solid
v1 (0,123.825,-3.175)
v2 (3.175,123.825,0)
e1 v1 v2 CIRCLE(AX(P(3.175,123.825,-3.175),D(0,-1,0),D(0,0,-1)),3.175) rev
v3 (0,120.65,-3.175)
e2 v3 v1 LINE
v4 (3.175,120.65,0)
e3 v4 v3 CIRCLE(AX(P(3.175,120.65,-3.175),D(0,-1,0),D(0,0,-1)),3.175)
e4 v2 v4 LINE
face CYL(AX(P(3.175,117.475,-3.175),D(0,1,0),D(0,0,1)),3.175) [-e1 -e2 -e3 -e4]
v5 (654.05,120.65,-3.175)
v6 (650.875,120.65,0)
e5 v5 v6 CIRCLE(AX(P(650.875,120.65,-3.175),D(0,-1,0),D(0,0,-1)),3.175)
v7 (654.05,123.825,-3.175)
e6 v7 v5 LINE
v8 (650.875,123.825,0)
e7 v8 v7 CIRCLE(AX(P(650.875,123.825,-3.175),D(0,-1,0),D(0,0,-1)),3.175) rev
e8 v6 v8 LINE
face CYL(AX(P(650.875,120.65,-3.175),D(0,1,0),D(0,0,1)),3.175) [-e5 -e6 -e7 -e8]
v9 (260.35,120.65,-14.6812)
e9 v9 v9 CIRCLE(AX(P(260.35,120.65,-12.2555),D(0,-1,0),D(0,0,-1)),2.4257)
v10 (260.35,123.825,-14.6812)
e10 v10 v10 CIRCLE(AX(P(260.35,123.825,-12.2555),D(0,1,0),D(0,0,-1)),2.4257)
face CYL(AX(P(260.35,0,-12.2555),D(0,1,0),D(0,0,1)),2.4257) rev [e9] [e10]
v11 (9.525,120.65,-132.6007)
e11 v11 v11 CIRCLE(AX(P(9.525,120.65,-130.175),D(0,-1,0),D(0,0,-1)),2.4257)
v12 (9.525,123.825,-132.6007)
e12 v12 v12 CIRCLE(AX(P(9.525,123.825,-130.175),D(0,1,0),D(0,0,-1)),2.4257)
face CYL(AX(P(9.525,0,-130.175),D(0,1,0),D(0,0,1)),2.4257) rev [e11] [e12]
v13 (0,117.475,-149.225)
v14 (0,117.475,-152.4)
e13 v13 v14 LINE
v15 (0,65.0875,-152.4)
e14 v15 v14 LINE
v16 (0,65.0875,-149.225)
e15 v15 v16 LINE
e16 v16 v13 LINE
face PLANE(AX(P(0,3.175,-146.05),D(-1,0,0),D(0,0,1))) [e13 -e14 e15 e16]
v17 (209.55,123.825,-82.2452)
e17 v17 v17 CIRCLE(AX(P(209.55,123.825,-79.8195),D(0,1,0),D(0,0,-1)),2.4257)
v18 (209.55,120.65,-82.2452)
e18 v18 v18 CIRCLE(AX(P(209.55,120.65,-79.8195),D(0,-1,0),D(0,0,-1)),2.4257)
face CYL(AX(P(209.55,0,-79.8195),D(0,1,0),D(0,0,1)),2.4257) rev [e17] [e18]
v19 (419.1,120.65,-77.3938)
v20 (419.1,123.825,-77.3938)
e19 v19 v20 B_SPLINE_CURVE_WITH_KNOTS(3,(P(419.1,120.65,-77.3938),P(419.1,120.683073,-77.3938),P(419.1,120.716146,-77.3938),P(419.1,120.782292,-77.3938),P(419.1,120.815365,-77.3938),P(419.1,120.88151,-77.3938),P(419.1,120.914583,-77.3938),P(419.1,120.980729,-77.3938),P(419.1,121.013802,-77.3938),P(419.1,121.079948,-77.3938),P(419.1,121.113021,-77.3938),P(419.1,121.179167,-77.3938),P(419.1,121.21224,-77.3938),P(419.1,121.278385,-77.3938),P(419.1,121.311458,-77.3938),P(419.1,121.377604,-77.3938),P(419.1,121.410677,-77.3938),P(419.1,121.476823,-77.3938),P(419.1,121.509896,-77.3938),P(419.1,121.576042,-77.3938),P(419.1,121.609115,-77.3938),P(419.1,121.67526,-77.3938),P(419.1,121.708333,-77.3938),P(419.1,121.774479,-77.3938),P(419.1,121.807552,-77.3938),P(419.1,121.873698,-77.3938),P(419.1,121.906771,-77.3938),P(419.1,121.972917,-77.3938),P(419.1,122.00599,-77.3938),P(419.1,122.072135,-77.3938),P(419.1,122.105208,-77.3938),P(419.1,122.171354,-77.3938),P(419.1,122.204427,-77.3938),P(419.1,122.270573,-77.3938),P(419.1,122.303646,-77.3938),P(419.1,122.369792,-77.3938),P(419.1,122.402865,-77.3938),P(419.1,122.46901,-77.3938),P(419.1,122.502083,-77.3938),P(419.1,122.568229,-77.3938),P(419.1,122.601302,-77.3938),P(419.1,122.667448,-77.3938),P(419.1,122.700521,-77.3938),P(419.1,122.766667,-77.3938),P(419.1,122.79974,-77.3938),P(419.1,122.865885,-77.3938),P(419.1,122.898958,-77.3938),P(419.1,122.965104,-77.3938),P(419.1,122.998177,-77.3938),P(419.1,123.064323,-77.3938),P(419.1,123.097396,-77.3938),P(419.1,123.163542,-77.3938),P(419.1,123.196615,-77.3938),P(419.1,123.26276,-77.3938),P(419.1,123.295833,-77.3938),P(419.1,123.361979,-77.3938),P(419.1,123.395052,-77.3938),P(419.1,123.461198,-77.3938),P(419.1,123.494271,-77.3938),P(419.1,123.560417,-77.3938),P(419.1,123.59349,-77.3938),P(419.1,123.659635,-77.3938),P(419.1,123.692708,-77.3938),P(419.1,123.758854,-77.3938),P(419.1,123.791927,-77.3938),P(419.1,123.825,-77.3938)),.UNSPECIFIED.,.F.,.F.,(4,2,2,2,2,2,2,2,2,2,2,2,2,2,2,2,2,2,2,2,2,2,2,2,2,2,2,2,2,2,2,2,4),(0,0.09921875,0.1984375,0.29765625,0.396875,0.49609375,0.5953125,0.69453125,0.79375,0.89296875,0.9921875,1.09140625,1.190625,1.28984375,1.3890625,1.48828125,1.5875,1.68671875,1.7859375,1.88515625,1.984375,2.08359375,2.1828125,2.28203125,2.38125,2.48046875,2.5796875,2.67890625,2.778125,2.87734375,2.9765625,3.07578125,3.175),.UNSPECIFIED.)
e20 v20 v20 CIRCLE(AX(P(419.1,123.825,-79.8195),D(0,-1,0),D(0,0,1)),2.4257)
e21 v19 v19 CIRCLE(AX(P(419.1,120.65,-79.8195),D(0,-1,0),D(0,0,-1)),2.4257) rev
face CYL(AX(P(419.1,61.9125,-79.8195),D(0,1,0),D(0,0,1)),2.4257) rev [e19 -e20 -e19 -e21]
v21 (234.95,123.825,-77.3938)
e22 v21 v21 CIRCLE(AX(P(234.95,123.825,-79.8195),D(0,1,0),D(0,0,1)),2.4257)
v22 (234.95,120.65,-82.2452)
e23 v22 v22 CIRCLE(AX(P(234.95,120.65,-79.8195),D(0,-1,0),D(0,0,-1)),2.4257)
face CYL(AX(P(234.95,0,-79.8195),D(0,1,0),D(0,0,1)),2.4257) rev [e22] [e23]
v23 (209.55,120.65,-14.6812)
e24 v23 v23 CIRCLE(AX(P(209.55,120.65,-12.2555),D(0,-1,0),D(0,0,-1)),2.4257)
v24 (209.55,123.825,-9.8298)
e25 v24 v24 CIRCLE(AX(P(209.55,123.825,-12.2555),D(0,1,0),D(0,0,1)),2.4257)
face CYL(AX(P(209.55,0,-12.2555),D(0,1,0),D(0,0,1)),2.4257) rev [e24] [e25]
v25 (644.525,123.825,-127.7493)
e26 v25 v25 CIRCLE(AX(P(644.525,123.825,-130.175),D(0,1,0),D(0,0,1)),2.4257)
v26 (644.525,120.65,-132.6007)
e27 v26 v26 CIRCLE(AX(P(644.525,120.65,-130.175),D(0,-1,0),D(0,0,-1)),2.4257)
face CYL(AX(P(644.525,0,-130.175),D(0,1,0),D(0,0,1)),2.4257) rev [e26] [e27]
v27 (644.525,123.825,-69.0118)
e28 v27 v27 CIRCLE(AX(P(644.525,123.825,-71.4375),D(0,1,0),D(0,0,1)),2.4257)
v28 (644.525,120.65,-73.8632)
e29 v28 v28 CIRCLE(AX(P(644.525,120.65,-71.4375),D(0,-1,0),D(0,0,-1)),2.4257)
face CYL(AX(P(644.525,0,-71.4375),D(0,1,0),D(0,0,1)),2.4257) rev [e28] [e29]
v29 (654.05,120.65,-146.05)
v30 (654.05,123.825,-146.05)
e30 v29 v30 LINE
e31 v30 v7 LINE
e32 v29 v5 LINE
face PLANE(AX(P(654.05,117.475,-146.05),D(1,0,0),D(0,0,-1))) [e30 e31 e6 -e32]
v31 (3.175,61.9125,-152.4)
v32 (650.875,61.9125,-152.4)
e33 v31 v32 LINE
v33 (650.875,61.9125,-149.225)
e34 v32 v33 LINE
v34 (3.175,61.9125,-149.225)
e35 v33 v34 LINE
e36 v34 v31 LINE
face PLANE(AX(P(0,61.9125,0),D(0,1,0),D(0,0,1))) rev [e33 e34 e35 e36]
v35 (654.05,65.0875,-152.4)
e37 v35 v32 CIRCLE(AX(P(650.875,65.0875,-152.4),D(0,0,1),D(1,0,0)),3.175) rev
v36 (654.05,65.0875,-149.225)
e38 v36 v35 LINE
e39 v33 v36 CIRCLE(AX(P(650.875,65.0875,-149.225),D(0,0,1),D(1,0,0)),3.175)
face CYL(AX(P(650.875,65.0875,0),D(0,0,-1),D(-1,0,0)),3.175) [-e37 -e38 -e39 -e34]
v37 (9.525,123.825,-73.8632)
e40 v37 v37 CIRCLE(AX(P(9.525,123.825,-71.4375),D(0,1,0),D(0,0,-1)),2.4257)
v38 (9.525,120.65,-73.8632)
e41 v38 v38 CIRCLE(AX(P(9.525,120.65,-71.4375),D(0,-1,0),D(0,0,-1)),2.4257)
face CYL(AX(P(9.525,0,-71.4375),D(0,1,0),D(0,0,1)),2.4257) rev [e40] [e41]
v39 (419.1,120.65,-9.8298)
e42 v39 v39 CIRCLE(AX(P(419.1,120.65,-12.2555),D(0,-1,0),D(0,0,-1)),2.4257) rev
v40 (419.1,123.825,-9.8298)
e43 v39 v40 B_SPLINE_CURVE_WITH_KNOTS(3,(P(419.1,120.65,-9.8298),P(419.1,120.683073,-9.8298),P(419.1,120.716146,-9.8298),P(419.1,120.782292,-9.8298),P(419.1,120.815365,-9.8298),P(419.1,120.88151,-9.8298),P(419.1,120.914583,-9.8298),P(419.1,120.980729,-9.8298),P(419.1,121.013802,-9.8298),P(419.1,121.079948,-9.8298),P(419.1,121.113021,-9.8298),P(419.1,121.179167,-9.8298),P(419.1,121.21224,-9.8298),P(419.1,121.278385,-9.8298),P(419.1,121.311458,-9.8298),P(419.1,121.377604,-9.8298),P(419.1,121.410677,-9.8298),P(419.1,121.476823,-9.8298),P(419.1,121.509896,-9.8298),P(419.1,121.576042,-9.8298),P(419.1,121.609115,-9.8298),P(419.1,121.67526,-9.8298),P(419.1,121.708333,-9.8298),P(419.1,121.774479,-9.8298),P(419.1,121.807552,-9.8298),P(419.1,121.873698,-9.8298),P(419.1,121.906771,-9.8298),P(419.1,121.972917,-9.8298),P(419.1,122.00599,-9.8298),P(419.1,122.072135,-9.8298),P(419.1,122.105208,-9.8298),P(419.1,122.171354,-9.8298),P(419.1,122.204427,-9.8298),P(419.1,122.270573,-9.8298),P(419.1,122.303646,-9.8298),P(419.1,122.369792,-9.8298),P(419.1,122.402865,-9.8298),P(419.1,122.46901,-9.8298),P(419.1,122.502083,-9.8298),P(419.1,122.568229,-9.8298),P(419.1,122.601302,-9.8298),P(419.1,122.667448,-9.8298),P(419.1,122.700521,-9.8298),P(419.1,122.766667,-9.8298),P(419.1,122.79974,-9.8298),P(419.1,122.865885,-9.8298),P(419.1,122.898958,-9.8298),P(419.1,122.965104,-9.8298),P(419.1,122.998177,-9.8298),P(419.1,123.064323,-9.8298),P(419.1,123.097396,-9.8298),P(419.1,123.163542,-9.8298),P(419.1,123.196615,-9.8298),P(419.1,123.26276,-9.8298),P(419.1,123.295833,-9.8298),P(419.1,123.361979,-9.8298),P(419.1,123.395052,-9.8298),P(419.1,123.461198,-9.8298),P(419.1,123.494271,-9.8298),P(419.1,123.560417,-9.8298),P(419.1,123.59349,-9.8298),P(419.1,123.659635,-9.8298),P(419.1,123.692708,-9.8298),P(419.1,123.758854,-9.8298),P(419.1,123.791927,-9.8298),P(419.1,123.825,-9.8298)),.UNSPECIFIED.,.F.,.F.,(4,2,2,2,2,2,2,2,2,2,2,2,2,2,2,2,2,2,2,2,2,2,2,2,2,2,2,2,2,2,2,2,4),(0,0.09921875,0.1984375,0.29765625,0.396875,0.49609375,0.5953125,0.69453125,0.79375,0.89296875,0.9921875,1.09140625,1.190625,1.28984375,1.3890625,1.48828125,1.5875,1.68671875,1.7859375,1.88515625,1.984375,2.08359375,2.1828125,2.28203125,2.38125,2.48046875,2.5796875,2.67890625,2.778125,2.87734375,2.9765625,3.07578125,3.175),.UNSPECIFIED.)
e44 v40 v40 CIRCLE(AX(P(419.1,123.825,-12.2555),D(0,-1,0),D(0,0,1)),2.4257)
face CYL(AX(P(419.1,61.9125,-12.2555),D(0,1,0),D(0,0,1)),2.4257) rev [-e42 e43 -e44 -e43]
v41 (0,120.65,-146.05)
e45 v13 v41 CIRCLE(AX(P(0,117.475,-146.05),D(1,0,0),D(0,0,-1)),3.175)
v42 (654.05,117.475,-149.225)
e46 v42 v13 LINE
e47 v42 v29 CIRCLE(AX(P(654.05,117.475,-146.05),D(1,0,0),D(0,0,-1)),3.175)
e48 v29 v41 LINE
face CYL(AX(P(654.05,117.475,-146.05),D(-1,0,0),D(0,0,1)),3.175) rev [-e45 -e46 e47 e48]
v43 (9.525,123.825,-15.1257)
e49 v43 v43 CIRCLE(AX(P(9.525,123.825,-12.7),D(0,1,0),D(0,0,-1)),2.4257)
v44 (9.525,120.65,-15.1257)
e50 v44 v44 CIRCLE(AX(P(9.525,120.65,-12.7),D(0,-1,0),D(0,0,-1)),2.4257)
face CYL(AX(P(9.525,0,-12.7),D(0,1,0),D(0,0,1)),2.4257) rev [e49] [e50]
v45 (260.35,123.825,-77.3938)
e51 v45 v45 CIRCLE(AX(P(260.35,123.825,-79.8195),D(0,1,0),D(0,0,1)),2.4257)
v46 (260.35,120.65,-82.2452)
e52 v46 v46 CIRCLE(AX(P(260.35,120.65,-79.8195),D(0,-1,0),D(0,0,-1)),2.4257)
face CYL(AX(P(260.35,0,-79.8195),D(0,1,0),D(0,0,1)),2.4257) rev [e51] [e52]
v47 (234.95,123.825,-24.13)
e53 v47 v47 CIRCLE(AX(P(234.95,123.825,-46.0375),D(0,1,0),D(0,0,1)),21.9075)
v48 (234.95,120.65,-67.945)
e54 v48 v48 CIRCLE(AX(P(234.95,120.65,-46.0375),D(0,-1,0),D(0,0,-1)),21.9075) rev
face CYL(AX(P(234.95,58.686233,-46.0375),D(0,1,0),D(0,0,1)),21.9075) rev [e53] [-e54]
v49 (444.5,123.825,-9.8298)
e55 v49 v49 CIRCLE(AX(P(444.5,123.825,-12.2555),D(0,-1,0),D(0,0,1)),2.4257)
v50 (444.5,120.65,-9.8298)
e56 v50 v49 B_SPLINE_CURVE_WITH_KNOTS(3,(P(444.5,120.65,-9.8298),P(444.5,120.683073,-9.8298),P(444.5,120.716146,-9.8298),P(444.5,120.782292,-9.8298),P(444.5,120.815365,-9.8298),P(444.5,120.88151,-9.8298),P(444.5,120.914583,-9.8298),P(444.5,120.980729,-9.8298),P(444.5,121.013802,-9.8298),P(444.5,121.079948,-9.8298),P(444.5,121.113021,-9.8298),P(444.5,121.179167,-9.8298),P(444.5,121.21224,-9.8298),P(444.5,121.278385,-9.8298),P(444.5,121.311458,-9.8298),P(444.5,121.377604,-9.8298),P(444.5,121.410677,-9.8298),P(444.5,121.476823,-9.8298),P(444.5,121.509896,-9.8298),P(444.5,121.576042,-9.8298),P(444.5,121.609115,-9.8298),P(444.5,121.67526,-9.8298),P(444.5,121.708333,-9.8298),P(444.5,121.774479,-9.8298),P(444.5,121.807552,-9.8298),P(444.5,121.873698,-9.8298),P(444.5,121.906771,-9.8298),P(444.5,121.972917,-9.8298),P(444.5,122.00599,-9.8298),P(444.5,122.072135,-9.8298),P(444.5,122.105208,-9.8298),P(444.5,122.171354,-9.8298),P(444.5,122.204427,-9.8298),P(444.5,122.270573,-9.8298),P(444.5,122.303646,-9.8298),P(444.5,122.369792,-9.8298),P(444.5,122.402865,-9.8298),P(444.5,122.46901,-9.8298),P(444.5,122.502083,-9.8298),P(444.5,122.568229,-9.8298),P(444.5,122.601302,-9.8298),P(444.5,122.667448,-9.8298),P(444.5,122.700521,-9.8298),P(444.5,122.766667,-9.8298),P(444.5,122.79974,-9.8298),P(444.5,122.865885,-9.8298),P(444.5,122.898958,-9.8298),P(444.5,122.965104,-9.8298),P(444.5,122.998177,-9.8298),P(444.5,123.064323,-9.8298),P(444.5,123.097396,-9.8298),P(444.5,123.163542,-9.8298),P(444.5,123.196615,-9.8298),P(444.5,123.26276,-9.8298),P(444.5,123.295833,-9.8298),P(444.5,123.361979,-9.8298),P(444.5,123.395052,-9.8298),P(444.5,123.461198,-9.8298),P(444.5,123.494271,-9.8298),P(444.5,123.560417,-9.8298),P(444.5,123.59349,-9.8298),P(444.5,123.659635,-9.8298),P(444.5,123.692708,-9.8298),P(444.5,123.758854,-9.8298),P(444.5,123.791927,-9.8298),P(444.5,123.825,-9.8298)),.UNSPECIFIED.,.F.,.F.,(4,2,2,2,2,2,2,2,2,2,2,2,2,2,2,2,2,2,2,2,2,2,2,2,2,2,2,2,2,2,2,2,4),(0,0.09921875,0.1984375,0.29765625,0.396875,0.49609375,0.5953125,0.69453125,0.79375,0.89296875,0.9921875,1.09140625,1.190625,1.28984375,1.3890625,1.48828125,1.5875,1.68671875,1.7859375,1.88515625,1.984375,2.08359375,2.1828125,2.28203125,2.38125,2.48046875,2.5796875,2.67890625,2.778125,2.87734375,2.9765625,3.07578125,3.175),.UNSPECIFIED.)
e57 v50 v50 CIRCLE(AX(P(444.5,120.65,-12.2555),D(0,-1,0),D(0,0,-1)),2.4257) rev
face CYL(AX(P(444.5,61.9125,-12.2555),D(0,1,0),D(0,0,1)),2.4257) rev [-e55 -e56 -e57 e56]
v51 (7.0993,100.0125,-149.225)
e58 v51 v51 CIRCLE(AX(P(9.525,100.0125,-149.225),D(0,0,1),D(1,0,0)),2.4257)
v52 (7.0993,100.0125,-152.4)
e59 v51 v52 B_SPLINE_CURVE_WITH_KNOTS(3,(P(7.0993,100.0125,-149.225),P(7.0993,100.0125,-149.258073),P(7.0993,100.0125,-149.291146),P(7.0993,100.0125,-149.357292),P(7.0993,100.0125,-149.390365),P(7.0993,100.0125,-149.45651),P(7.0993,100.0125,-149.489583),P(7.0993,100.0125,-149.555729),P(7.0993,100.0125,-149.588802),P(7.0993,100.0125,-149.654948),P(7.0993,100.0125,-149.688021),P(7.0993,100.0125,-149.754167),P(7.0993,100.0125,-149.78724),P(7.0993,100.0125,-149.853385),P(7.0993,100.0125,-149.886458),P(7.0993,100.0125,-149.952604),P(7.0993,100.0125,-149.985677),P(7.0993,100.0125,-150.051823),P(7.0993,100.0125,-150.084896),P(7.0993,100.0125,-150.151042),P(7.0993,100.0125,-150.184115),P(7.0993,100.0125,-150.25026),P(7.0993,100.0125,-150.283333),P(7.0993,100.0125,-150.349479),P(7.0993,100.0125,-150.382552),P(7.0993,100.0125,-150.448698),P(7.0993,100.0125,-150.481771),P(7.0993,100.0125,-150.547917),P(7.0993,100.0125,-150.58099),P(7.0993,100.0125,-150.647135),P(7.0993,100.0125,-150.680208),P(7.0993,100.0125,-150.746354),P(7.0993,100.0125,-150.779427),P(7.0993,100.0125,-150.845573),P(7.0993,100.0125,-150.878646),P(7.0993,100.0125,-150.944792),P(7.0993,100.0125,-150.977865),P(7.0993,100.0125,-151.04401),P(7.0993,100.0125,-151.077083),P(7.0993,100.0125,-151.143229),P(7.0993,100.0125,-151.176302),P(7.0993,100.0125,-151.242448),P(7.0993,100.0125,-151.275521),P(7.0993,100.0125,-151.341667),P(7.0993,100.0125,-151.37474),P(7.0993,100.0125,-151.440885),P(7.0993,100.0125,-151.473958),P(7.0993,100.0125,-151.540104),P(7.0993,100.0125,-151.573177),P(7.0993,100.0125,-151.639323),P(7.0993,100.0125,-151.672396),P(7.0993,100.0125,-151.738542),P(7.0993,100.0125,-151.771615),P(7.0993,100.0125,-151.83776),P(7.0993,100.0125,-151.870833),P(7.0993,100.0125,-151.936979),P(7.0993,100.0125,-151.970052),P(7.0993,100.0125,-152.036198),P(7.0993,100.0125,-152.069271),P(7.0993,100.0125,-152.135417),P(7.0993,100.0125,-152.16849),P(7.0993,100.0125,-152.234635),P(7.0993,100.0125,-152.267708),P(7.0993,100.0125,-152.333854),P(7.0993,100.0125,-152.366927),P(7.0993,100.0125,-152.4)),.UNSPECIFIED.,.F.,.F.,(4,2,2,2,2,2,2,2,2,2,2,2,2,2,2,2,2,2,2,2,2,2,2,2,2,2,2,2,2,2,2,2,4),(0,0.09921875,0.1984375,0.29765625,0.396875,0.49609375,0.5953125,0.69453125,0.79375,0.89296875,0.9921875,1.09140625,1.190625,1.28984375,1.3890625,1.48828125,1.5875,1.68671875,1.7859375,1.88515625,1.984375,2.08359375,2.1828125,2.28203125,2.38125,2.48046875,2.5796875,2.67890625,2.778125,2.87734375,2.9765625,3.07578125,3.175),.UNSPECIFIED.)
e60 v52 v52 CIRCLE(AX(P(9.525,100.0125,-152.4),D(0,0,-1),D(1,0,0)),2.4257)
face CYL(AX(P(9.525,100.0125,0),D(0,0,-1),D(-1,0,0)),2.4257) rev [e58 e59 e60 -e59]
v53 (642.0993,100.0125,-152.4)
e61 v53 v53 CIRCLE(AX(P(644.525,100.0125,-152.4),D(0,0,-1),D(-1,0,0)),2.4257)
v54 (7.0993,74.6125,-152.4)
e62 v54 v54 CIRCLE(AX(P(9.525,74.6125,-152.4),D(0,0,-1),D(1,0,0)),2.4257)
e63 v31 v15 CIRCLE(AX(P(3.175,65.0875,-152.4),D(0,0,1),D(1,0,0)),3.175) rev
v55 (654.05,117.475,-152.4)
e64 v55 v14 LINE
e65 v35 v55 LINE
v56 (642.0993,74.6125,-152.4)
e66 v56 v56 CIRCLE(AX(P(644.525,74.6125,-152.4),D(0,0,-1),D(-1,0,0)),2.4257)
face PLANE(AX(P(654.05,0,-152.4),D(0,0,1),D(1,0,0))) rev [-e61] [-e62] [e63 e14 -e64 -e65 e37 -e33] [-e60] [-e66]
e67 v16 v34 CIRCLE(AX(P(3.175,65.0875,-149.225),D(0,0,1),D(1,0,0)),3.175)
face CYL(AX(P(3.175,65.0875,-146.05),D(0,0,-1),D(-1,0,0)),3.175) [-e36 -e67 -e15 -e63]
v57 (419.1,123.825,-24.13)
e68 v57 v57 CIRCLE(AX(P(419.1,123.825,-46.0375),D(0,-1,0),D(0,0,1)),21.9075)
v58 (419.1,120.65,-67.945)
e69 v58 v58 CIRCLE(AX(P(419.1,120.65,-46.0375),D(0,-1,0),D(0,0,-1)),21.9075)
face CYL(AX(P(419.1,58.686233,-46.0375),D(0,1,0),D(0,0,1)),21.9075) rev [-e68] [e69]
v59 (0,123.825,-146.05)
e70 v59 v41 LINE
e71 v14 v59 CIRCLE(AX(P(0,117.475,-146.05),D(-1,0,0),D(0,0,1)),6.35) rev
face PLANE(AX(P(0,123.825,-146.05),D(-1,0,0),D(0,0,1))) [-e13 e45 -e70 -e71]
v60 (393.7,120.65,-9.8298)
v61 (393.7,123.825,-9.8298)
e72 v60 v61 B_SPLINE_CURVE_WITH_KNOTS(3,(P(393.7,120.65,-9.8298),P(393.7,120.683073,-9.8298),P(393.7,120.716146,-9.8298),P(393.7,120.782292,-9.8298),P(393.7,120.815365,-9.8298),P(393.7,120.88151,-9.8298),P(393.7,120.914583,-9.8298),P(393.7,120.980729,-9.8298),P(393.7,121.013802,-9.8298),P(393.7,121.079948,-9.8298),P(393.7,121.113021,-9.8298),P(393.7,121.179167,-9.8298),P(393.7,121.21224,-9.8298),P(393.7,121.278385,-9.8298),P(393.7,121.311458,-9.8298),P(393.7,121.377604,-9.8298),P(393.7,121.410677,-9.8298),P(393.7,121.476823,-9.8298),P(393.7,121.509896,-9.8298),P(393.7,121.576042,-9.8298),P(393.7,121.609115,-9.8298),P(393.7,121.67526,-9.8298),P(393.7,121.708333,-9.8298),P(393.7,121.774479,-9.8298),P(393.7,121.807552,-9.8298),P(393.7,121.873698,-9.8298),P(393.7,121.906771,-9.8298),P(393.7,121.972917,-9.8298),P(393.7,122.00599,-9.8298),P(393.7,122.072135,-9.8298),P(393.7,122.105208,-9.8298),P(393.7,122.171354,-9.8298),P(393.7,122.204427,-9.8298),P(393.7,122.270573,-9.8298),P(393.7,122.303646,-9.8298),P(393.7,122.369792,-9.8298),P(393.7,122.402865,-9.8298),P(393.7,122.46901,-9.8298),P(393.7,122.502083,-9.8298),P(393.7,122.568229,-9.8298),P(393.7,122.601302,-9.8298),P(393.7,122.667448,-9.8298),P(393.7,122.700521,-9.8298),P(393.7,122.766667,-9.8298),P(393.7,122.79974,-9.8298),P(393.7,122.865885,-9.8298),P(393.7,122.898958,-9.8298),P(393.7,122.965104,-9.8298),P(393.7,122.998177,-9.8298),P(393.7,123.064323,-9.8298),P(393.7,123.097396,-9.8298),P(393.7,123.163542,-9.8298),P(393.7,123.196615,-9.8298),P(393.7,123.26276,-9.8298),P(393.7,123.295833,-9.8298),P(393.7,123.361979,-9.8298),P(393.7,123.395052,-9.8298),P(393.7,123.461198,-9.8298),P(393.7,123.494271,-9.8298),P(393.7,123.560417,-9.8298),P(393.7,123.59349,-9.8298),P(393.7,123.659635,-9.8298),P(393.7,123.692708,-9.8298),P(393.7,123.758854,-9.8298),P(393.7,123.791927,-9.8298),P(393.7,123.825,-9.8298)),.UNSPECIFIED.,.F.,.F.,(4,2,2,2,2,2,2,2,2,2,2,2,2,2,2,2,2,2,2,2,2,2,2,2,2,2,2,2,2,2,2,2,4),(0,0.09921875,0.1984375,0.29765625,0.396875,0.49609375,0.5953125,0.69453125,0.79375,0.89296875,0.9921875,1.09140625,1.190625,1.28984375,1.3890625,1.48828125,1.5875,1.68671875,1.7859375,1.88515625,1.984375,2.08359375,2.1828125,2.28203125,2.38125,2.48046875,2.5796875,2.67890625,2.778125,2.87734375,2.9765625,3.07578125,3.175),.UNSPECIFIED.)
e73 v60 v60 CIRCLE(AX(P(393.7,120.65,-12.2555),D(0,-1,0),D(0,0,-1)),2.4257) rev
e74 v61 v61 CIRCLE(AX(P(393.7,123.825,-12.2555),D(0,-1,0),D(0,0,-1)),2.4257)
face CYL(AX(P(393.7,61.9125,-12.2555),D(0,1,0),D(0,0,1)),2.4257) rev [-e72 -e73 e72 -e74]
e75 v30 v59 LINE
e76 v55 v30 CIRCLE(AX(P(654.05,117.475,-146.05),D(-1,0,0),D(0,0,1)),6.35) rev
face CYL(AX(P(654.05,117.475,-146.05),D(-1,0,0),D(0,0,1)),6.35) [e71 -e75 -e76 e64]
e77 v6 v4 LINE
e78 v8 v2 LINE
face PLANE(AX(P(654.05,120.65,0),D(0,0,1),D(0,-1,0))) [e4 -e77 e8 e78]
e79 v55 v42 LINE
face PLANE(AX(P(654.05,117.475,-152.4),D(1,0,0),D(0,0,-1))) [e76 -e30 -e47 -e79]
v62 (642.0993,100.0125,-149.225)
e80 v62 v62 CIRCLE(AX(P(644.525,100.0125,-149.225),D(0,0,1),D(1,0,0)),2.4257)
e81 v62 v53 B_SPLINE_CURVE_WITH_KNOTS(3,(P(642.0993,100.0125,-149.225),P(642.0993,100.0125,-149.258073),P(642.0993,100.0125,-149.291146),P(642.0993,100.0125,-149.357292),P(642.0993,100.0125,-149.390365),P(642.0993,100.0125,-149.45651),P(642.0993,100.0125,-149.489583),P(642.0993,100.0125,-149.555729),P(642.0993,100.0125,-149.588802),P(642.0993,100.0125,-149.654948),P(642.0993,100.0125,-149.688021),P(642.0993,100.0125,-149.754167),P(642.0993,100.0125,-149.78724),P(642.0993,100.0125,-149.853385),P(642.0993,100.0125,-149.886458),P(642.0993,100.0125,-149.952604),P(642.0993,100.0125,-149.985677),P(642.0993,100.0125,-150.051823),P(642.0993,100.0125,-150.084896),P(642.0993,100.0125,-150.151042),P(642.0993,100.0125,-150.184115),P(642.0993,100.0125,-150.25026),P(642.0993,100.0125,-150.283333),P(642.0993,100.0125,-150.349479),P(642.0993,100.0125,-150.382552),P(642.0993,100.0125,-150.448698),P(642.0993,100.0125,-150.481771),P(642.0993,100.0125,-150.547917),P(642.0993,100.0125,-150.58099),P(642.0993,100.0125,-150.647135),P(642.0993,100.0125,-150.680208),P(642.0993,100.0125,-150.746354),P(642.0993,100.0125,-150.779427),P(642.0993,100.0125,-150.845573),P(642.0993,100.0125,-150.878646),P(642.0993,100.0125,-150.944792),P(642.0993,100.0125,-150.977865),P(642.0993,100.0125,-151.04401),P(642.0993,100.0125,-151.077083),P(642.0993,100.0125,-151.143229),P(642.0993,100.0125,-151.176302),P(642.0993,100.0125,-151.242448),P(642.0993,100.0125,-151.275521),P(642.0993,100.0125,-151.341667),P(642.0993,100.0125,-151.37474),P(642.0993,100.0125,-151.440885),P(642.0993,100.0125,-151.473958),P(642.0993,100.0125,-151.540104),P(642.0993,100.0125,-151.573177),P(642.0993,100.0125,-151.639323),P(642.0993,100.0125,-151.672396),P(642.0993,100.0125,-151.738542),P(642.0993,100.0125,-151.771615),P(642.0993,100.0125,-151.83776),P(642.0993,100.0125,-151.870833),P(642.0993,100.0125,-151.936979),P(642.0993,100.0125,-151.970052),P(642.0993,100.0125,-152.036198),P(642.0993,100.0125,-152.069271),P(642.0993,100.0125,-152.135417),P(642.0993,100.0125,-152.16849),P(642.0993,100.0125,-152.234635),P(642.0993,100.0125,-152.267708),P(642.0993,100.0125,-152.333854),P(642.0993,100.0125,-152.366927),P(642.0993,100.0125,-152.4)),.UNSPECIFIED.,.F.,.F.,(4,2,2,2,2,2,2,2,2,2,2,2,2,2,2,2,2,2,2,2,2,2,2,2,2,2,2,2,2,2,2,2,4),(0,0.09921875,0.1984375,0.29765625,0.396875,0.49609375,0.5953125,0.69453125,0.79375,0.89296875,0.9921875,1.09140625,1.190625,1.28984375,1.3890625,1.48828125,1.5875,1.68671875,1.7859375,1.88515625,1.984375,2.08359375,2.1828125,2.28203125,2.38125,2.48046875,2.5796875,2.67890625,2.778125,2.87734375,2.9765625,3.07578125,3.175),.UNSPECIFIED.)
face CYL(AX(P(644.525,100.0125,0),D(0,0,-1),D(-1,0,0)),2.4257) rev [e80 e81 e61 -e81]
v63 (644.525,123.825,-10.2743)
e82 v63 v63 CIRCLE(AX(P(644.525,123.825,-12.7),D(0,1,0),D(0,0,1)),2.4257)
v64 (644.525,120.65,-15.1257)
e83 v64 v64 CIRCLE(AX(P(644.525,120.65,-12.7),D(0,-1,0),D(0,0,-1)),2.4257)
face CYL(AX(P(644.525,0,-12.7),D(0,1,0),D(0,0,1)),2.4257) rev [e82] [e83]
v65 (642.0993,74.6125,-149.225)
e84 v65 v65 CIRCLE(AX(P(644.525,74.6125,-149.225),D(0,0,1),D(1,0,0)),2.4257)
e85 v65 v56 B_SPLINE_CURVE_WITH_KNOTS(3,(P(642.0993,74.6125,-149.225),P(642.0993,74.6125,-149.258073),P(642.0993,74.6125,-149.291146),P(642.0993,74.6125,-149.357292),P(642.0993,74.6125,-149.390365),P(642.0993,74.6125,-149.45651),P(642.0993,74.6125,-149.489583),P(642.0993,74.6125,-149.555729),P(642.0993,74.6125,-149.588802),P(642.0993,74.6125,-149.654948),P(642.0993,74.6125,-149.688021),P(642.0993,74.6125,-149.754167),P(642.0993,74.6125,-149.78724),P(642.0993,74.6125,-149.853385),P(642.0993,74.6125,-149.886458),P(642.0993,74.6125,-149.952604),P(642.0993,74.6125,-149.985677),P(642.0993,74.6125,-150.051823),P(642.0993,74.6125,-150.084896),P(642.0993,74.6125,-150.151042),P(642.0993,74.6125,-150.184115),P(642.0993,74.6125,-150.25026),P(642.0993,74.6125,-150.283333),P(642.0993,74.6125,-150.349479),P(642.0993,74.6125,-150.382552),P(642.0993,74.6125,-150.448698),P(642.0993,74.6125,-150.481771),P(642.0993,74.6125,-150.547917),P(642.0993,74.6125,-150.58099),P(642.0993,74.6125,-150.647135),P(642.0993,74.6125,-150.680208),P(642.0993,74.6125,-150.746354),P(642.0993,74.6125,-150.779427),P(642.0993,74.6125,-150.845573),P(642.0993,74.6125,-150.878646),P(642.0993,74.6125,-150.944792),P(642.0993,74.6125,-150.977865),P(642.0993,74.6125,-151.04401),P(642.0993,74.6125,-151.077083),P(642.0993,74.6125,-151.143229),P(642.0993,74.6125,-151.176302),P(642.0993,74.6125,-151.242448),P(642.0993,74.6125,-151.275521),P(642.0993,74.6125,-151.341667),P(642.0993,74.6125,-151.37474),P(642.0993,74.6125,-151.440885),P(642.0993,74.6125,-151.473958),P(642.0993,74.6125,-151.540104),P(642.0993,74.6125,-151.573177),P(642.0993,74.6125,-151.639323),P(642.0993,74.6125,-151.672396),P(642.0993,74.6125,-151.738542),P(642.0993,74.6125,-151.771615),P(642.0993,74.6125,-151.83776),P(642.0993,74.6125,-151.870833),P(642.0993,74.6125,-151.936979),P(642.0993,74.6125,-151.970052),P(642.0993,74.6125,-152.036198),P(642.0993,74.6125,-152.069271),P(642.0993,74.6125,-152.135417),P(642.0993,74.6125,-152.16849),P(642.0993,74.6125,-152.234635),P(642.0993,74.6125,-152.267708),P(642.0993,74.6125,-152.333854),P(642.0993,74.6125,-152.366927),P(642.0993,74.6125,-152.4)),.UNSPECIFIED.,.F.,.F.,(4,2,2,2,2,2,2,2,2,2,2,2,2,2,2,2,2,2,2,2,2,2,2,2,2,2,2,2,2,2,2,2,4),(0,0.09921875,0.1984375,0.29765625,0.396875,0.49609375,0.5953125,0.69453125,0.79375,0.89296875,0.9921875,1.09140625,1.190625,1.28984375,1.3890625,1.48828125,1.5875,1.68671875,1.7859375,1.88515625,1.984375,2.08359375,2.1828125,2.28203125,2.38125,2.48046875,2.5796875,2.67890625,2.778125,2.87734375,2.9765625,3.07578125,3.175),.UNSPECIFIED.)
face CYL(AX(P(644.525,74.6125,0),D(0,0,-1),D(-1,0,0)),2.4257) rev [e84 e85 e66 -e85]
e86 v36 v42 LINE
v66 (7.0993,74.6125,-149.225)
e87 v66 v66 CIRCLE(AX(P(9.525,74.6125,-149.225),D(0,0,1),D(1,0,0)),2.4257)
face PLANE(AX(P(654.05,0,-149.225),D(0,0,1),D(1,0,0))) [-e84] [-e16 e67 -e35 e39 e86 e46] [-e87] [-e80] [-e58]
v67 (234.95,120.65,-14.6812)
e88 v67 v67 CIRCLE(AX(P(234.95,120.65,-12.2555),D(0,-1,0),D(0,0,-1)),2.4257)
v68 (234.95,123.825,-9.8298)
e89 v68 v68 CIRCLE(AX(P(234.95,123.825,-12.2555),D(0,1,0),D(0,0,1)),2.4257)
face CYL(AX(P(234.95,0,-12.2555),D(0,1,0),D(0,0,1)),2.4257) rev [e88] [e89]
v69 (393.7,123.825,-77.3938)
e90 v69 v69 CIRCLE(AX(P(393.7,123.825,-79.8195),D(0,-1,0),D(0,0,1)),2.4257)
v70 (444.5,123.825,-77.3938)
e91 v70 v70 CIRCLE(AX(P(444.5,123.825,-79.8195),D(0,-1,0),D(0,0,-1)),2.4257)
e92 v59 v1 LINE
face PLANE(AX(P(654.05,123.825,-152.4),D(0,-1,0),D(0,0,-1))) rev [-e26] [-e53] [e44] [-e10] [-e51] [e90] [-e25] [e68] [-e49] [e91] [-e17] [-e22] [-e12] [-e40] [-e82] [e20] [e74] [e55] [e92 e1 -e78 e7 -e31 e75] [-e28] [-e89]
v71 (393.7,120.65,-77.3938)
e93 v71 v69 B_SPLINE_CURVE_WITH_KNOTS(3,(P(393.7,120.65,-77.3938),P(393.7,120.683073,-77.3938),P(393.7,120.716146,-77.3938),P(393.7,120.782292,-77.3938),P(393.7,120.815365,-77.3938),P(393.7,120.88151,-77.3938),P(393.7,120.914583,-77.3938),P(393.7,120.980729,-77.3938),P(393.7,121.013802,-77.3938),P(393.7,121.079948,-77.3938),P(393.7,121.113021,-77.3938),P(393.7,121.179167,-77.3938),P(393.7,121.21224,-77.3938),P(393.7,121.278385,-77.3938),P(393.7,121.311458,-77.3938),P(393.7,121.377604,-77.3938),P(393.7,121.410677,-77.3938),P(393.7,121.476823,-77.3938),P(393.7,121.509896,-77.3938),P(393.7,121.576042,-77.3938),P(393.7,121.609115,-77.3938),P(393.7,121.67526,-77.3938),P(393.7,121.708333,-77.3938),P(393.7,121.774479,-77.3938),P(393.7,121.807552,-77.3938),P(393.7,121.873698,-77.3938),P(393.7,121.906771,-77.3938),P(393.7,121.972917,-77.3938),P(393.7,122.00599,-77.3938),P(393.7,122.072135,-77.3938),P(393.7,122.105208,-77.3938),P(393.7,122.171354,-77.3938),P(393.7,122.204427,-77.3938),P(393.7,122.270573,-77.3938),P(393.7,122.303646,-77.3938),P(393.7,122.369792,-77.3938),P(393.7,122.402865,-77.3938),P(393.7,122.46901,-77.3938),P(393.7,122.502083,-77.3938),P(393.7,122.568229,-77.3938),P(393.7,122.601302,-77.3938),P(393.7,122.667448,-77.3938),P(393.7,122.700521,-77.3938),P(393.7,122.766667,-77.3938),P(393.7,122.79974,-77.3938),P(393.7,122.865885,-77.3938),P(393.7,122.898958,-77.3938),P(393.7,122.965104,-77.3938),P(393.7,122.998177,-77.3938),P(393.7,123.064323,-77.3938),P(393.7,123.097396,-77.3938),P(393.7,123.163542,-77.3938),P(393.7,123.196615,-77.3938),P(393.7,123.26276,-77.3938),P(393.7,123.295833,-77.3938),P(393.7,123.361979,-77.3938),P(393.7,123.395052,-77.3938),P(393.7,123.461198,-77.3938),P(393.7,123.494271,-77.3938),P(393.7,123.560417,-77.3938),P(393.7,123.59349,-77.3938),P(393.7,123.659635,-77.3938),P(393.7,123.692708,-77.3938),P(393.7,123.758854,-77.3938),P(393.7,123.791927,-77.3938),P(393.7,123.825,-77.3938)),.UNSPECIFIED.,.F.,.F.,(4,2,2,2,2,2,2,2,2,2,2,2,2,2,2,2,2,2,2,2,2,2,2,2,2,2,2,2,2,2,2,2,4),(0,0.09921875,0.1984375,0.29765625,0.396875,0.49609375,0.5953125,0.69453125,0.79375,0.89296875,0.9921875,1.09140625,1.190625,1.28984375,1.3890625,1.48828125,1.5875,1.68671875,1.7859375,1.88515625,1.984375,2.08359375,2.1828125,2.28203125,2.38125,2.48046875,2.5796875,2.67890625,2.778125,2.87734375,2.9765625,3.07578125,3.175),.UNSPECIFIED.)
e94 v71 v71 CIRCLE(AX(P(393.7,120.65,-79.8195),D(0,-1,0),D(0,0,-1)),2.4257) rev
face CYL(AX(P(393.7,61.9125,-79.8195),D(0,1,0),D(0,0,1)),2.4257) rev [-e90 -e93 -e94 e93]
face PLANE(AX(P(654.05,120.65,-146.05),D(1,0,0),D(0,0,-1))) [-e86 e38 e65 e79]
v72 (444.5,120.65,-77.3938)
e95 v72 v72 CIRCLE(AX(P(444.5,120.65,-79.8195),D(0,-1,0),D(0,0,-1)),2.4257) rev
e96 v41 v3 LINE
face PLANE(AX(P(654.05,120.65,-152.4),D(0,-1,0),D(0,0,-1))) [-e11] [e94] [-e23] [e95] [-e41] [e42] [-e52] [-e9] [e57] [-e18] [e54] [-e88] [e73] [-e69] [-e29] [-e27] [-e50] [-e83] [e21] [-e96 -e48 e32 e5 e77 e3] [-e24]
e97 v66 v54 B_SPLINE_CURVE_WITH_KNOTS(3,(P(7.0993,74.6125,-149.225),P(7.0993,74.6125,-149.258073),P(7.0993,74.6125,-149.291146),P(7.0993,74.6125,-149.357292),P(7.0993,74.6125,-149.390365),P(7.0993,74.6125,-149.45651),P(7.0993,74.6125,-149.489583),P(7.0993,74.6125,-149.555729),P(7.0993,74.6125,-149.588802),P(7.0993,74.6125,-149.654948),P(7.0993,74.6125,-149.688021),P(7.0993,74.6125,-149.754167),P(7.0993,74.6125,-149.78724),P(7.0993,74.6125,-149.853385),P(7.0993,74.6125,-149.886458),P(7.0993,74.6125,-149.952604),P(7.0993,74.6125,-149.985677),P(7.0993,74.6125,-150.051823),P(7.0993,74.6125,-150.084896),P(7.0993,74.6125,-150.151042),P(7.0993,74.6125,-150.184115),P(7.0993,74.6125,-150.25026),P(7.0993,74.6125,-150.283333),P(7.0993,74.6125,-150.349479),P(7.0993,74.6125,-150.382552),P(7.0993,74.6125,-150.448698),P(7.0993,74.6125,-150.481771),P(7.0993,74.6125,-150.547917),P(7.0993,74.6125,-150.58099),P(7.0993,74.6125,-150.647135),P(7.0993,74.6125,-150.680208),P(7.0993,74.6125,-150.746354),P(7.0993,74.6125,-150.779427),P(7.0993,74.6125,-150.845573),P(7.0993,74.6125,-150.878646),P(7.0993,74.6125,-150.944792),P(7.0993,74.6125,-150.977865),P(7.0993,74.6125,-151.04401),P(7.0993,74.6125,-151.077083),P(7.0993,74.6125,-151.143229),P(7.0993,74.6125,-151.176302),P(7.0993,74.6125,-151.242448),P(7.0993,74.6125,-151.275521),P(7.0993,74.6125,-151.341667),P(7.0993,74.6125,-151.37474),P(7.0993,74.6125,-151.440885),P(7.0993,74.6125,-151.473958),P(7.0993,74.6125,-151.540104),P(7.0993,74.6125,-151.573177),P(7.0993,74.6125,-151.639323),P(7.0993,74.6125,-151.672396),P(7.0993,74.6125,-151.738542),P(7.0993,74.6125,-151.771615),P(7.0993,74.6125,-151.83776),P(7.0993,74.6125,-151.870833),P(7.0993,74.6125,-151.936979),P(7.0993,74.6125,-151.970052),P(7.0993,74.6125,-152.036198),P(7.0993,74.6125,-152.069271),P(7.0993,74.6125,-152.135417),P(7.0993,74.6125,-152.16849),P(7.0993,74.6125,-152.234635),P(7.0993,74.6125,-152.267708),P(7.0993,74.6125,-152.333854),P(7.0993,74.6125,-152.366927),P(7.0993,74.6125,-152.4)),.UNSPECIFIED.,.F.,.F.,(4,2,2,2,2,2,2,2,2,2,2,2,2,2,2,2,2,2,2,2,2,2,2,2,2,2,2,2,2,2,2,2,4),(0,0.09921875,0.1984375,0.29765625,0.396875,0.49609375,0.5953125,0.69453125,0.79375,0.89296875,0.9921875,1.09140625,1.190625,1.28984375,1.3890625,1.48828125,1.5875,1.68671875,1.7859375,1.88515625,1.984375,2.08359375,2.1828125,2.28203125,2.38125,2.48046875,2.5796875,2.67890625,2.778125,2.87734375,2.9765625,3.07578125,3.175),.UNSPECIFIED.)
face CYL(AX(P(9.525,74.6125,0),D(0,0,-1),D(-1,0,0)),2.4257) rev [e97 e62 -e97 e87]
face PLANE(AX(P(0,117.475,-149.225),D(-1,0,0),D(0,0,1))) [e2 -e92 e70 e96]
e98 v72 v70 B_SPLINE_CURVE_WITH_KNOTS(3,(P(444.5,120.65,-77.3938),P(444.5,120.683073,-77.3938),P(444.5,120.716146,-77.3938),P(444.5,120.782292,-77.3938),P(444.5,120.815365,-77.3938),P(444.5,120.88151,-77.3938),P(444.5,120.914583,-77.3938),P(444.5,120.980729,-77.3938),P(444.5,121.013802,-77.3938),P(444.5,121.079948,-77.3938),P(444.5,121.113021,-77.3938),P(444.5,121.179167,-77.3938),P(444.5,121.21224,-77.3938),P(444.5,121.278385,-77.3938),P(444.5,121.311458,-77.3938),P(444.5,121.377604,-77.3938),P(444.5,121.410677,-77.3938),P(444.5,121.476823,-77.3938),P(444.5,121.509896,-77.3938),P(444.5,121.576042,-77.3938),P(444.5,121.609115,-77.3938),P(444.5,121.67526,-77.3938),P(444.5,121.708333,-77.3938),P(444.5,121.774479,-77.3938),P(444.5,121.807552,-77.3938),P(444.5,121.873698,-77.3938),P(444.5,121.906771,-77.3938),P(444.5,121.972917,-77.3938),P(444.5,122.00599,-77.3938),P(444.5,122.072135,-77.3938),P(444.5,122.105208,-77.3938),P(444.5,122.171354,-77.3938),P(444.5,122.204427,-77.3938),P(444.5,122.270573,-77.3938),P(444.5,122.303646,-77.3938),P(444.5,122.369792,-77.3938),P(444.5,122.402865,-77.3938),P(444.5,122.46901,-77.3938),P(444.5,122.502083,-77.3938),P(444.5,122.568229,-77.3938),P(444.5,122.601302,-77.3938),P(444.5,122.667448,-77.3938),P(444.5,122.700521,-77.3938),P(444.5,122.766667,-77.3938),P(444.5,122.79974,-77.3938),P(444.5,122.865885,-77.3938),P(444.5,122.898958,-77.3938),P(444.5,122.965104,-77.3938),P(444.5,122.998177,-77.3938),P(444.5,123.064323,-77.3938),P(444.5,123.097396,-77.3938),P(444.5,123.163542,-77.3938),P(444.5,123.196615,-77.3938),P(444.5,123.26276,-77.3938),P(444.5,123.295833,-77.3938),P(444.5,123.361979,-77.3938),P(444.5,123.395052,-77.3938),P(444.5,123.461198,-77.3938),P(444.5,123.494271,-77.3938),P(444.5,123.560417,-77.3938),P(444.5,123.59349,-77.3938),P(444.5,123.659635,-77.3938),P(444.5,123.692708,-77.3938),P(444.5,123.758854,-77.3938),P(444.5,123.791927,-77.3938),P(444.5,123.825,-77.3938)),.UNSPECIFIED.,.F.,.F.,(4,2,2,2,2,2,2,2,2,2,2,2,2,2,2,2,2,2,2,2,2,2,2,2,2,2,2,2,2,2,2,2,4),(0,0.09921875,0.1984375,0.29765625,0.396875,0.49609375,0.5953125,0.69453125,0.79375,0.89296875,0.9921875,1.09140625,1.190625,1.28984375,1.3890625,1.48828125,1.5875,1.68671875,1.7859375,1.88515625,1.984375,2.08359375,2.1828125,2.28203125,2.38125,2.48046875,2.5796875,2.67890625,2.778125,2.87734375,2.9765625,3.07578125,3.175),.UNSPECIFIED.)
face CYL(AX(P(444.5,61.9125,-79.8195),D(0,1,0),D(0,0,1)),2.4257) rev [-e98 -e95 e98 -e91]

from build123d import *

# Parameters (mm, degrees)
BASE_FLANGE1_DEPTH = 654.05
SKETCH6_R          = 21.9075
CUT_EXTRUDE1_DEPTH = 3.175
SKETCH7_R          = 2.4257
CUT_EXTRUDE2_DEPTH = 683.89076222
SKETCH8_R          = 2.4257
CUT_EXTRUDE3_DEPTH = 683.89076222
SKETCH9_R          = 2.4257
CUT_EXTRUDE4_DEPTH = 683.89076222
FILLET1_R          = 3.175
SKETCH10_W         = 152.4
SKETCH10_H         = 61.9125
CUT_EXTRUDE5_DEPTH = 683.89076222
FILLET2_R          = 3.175


# Sheet-metal steps are written as plain solids
with BuildPart() as part:
    # Sketch1 → Base-Flange1 (new body)
    with BuildSketch(Plane(origin=(0, 0, 0), x_dir=(0, 0, -1), z_dir=(1, 0, 0))):
        with BuildLine():
            Line((0, 0), (146.05, 0))
            ThreePointArc((146.05, 0), (150.540128061, 1.859871939), (152.4, 6.35))
            Line((152.4, 6.35), (152.4, 117.475))
            ThreePointArc((152.4, 117.475), (150.540128061, 121.965128061), (146.05, 123.825))
            Line((146.05, 123.825), (0, 123.825))
            Line((0, 123.825), (0, 120.65))
            Line((0, 120.65), (146.05, 120.65))
            ThreePointArc((146.05, 120.65), (148.29506403, 119.72006403), (149.225, 117.475))
            Line((149.225, 117.475), (149.225, 6.35))
            ThreePointArc((149.225, 6.35), (148.29506403, 4.10493597), (146.05, 3.175))
            Line((146.05, 3.175), (0, 3.175))
            Line((0, 3.175), (0, 0))
        make_face()
    extrude(amount=BASE_FLANGE1_DEPTH)

    # Sketch6 → Cut-Extrude1 (cut)
    with BuildSketch(Plane(origin=(0, 123.825, 0), x_dir=(1, 0, 0), z_dir=(0, 1, 0))):
        with Locations(Location((234.95, 46.0375, 0), (0, 0, 270))):
            Circle(SKETCH6_R)
    cut_extrude1 = extrude(amount=-CUT_EXTRUDE1_DEPTH, mode=Mode.SUBTRACT)

    # Sketch7 → Cut-Extrude2 (cut, through all)
    with BuildSketch(Plane(origin=(0, 123.825, 0), x_dir=(1, 0, 0), z_dir=(0, 1, 0))):
        with Locations(Location((234.95, 12.2555, 0), (0, 0, 270))):
            Circle(SKETCH7_R)
        with Locations(Location((234.95, 79.8195, 0), (0, 0, 270))):
            Circle(SKETCH7_R)
        with Locations(Location((209.55, 12.2555, 0), (0, 0, 270))):
            Circle(SKETCH7_R)
        with Locations(Location((260.35, 12.2555, 0), (0, 0, 270))):
            Circle(SKETCH7_R)
        with Locations(Location((260.35, 79.8195, 0), (0, 0, 270))):
            Circle(SKETCH7_R)
        with Locations(Location((209.55, 79.8195, 0), (0, 0, 270))):
            Circle(SKETCH7_R)
    cut_extrude2 = extrude(amount=-CUT_EXTRUDE2_DEPTH, mode=Mode.SUBTRACT)

    # Sketch8 → Cut-Extrude3 (cut, through all)
    with BuildSketch(Plane(origin=(0, 123.825, 0), x_dir=(1, 0, 0), z_dir=(0, 1, 0))):
        with Locations(Location((644.525, 12.7, 0), (0, 0, 270))):
            Circle(SKETCH8_R)
        with Locations(Location((644.525, 71.4375, 0), (0, 0, 270))):
            Circle(SKETCH8_R)
        with Locations(Location((644.525, 130.175, 0), (0, 0, 270))):
            Circle(SKETCH8_R)
        with Locations(Location((9.525, 130.175, 0), (0, 0, 270))):
            Circle(SKETCH8_R)
        with Locations(Location((9.525, 71.4375, 0), (0, 0, 270))):
            Circle(SKETCH8_R)
        with Locations(Location((9.525, 12.7, 0), (0, 0, 270))):
            Circle(SKETCH8_R)
    extrude(amount=-CUT_EXTRUDE3_DEPTH, mode=Mode.SUBTRACT)

    # Sketch9 → Cut-Extrude4 (cut, through all)
    with BuildSketch(Plane(origin=(0, 0, -152.4), x_dir=(-1, 0, 0), z_dir=(0, 0, -1))):
        with Locations((-644.525, 74.6125)):
            Circle(SKETCH9_R)
        with Locations((-644.525, 49.2125)):
            Circle(SKETCH9_R)
        with Locations((-9.525, 49.2125)):
            Circle(SKETCH9_R)
        with Locations((-9.525, 74.6125)):
            Circle(SKETCH9_R)
        with Locations((-644.525, 100.0125)):
            Circle(SKETCH9_R)
        with Locations((-644.525, 23.8125)):
            Circle(SKETCH9_R)
        with Locations((-9.525, 23.8125)):
            Circle(SKETCH9_R)
        with Locations((-9.525, 100.0125)):
            Circle(SKETCH9_R)
    extrude(amount=-CUT_EXTRUDE4_DEPTH, mode=Mode.SUBTRACT)

    # Fillet1
    fillet1_edges = [part.edges().sort_by_distance(p)[0] for p in [
        (0, 1.5875, 0),
        (0, 122.2375, 0),
        (654.05, 1.5875, 0),
        (654.05, 122.2375, 0),
    ]]
    fillet(fillet1_edges, radius=FILLET1_R)

    # Sketch10 → Cut-Extrude5 (cut, through all)
    with BuildSketch(Plane(origin=(654.05, 0, 0), x_dir=(0, 0, -1), z_dir=(1, 0, 0))):
        with Locations((76.2, 30.95625)):
            Rectangle(SKETCH10_W, SKETCH10_H)
    extrude(amount=-CUT_EXTRUDE5_DEPTH, mode=Mode.SUBTRACT)

    # Fillet2
    fillet2_edges = [part.edges().sort_by_distance(p)[0] for p in [
        (654.05, 61.9125, -150.8125),
        (0, 61.9125, -150.8125),
    ]]
    fillet(fillet2_edges, radius=FILLET2_R)

    # Mirror1: Cut-Extrude1, Cut-Extrude2 across plane
    add(cut_extrude1.mirror(Plane.ZY.offset(-327.025)), mode=Mode.SUBTRACT)
    add(cut_extrude2.mirror(Plane.ZY.offset(-327.025)), mode=Mode.SUBTRACT)


solid = part.part
